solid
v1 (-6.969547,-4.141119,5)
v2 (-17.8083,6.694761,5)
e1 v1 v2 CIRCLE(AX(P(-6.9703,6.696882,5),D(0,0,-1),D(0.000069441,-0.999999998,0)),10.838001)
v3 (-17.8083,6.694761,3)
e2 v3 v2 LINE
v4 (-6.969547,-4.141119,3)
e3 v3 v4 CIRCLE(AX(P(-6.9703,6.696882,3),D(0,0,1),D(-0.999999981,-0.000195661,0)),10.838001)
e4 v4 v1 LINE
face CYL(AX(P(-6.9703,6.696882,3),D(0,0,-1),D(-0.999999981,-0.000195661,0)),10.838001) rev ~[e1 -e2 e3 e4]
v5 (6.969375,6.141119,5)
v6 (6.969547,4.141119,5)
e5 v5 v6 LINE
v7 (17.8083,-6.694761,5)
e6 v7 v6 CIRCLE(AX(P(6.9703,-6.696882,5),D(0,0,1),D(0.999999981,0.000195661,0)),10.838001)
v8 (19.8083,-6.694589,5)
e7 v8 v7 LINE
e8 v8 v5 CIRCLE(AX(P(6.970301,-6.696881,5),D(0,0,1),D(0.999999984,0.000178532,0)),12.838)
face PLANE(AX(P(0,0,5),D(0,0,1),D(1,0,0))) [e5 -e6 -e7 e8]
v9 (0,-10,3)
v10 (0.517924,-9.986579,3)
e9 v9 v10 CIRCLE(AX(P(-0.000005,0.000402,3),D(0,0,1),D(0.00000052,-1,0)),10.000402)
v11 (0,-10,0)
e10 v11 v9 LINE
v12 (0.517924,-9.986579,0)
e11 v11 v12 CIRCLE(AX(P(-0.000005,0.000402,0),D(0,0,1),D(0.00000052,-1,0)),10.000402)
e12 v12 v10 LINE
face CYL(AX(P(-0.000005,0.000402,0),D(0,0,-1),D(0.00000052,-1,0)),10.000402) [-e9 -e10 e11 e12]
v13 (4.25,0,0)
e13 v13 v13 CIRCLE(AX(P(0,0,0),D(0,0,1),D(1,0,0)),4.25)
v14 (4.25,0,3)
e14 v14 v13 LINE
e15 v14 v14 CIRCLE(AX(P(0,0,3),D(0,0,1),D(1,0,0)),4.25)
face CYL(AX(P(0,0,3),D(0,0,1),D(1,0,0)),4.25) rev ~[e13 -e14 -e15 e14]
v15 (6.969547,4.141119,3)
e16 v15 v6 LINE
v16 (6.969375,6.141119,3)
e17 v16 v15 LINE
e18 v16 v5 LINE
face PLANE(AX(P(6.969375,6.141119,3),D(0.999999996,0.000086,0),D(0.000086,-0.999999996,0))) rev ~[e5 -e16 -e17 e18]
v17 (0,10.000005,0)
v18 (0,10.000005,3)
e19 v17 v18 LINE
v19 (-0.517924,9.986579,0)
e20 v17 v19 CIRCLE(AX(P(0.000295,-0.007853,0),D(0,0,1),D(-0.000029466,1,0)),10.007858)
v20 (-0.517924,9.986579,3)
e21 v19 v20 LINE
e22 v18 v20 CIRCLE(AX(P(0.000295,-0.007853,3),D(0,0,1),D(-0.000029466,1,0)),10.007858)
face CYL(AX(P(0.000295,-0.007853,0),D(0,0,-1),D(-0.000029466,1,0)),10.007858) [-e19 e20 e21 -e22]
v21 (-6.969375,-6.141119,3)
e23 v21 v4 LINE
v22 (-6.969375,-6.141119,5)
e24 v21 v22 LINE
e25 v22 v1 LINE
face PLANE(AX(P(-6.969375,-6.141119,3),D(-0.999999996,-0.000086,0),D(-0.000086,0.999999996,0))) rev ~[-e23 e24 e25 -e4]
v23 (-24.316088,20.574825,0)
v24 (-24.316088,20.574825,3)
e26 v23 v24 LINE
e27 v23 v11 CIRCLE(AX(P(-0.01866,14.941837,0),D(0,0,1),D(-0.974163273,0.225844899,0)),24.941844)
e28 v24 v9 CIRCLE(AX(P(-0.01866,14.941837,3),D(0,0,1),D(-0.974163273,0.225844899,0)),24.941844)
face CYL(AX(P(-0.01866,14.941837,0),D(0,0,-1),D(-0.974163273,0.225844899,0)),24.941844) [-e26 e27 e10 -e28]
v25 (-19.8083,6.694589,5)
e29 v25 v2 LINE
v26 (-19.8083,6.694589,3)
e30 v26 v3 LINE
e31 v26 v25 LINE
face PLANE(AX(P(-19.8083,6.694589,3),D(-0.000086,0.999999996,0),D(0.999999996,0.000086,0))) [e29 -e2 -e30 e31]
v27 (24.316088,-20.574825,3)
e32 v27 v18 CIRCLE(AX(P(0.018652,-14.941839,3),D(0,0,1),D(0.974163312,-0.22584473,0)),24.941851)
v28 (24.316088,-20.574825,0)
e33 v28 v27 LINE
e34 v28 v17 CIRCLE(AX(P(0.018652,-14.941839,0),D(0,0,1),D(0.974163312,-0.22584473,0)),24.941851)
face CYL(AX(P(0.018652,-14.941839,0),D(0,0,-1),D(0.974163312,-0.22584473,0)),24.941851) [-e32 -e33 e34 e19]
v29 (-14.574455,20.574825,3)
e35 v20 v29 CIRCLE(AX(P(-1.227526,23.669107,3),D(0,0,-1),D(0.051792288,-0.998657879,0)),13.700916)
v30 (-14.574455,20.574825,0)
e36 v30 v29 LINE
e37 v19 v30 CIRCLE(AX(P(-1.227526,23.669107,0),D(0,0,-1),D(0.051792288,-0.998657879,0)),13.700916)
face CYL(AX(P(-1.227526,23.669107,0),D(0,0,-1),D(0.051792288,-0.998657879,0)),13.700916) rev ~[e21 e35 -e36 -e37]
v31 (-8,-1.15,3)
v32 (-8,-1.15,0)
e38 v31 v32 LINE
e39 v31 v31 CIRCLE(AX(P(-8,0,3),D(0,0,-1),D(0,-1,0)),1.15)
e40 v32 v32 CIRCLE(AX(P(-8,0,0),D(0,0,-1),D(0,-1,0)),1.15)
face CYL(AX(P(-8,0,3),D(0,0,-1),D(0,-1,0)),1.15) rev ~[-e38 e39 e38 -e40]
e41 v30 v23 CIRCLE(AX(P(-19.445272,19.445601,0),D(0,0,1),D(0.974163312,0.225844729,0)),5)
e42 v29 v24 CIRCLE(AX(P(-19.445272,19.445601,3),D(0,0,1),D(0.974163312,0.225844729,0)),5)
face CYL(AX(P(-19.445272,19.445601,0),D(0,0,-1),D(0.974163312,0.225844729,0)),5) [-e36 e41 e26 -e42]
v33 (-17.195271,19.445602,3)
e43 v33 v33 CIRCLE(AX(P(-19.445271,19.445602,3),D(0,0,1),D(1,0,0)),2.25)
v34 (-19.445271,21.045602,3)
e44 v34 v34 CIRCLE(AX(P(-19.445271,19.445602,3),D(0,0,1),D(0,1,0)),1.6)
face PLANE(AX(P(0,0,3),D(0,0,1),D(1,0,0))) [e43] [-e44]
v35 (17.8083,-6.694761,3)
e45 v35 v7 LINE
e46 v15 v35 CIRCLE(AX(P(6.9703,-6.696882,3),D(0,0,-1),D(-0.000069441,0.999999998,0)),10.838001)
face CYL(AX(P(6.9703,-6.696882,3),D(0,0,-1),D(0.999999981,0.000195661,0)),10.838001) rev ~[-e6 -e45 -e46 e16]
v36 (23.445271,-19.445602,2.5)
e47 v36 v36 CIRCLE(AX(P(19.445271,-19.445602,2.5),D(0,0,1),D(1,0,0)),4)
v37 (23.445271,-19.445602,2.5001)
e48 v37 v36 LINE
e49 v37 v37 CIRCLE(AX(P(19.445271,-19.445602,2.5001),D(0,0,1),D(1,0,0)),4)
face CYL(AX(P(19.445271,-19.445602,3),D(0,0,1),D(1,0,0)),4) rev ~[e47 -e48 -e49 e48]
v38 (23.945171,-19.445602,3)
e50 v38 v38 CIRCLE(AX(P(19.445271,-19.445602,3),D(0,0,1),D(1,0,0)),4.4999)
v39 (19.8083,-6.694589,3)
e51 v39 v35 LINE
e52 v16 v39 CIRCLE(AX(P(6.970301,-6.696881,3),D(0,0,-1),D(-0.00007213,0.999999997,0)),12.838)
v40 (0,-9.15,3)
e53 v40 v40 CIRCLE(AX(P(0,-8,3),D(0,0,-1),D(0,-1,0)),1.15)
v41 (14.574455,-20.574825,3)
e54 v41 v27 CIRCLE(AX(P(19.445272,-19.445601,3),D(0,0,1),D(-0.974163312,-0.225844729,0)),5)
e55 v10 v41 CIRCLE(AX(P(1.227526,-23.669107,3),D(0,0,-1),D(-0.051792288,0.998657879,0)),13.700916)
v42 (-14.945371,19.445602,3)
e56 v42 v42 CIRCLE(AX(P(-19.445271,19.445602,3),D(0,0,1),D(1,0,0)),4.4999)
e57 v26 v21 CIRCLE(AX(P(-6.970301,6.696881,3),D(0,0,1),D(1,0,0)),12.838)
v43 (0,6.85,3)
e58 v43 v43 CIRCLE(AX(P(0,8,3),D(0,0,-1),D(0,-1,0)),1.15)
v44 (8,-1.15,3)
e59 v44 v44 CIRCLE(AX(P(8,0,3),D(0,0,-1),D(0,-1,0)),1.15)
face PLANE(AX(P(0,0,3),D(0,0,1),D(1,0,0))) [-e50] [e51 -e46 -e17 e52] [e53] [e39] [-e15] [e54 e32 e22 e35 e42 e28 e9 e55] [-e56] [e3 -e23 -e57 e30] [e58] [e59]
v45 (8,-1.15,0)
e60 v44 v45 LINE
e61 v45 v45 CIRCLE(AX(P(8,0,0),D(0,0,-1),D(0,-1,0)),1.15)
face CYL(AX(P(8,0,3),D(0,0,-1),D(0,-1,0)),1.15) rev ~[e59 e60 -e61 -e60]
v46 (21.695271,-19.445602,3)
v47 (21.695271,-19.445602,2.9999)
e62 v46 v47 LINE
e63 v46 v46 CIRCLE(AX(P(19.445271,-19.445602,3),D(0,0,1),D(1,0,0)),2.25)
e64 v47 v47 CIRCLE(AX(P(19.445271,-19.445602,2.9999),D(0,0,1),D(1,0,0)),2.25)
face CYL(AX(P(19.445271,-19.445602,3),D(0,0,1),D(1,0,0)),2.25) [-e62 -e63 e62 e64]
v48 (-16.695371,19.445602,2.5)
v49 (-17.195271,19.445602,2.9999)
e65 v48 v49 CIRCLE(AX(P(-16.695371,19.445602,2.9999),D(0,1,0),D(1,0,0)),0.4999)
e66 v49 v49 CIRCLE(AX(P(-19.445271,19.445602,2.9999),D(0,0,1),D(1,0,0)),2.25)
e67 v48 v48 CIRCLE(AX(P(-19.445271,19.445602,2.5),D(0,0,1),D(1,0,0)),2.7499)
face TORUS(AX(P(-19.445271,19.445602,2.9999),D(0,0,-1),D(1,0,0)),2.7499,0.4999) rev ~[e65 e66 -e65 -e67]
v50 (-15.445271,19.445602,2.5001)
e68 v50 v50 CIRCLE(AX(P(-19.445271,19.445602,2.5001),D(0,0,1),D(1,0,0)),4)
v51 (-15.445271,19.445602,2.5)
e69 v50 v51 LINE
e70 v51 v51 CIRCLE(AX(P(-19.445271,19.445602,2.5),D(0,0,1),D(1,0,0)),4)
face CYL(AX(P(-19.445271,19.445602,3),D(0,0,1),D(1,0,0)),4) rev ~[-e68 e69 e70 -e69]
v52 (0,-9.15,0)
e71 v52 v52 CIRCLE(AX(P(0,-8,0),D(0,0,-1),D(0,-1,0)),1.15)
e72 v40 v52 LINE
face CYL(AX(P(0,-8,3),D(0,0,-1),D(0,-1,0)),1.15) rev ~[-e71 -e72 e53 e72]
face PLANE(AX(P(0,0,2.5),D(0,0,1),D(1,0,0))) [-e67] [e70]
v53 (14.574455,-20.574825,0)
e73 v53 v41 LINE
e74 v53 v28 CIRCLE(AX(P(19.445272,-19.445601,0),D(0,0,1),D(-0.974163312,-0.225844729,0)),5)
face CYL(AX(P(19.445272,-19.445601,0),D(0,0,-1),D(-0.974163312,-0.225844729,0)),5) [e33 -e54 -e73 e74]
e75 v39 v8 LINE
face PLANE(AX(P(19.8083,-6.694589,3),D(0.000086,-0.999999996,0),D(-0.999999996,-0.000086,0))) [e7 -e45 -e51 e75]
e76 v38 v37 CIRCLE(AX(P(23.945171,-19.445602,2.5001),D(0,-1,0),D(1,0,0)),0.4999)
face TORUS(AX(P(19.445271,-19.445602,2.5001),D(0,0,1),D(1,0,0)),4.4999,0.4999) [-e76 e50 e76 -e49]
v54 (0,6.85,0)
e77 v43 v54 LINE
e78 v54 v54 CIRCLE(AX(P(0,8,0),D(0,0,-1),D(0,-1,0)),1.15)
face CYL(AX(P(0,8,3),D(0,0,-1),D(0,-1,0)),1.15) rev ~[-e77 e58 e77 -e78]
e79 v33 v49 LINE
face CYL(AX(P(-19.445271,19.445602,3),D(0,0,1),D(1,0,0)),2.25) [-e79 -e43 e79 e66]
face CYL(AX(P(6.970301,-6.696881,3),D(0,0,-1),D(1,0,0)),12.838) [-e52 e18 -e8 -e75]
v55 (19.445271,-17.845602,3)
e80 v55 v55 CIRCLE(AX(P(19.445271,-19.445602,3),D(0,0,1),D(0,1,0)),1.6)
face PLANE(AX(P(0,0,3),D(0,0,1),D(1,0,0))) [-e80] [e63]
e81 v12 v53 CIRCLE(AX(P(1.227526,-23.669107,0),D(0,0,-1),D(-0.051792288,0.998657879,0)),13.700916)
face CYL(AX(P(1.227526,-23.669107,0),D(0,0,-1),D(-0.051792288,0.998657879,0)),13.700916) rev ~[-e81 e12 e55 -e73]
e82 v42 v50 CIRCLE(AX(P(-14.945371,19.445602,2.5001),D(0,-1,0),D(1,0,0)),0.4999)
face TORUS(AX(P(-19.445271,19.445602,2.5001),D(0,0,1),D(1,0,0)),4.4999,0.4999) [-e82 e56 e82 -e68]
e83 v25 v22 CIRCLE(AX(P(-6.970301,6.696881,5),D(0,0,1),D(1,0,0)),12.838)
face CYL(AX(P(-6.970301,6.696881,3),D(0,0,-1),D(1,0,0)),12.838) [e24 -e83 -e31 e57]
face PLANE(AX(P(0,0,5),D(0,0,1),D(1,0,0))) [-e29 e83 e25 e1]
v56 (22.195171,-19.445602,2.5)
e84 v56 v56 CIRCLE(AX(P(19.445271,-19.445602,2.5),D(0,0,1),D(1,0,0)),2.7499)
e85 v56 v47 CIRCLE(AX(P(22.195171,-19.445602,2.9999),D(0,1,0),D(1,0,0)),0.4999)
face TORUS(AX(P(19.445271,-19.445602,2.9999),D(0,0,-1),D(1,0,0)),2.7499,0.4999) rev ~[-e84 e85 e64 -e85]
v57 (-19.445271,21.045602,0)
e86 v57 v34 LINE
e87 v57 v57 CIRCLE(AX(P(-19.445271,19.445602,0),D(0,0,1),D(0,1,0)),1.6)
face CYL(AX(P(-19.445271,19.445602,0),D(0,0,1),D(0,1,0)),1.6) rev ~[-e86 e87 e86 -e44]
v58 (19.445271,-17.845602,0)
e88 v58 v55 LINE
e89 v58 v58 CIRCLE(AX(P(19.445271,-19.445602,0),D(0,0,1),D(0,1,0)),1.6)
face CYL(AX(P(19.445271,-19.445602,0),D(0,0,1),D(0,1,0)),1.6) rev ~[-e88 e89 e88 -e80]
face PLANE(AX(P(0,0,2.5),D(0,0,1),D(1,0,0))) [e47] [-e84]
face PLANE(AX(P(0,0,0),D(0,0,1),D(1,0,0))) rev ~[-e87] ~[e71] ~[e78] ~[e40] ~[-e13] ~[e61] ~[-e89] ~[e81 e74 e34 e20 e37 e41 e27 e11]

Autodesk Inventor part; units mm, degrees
ref_plane "YZ Plane" through (0, 0, 0) normal (1, 0, 0) x (0, 1, 0)
ref_plane "XZ Plane" through (0, 0, 0) normal (0, 1, 0) x (-1, 0, 0)
ref_plane "XY Plane" through (0, 0, 0) normal (0, 0, 1) x (1, 0, 0)
sketch "スケッチ1" plane through (0, 0, 0) normal (0, 0, 1) x (1, 0, 0)
  circle A0 centre (0, 0) radius 27.5
  line L0 (0, 27.5) -> (0, 0)
  line L1 (8, 0) -> (19.445271, -19.445602)
  line L2 (0, 0) -> (27.5, 0)
  circle A1 centre (19.445271, -19.445602) radius 5
  circle A2 centre (0, 0) radius 10
  arc A3 (24.316088, -20.574825) -> (0, 10.000005) centre (0.018653, -14.941839) ccw
  line L3 (24.316088, -20.574825) -> (14.574455, -20.574825)
  arc A4 (14.574455, -20.574825) -> (0.517924, -9.986579) centre (1.227526, -23.669106) ccw
  arc A5 (-24.316088, 20.574825) -> (0, -10.000005) centre (-0.018653, 14.941839) ccw
  arc A6 (-14.574455, 20.574825) -> (-0.517924, 9.986579) centre (-1.227526, 23.669106) ccw
  circle A7 centre (-19.445271, 19.445602) radius 5
  point P0 (-0.517924, 9.986579)
  point P1 (0, -10)
  point P2 (0, 10.000005)
  dimension "d4" = 20
  dimension "d0" = 55
  dimension "d1" = 8
  dimension "d2" = 22.56381
  dimension "d3" = 10
  dimension "d5" = 9.74163
  dimension "d9" = 360
sketch "スケッチ1 outline for 押し出し1" plane through (0, 0, 0) normal (0, 0, 1) x (1, 0, 0)
  arc A0 (14.574455, -20.574825) -> (24.316088, -20.574825) centre (19.445271, -19.445602) ccw
  arc A1 (24.316088, -20.574825) -> (0, 10.000005) centre (0.018653, -14.941839) ccw
  arc A2 (0, 10) -> (-0.517924, 9.986579) centre (0, 0) ccw
  arc A3 (-0.517924, 9.986579) -> (-14.574455, 20.574825) centre (-1.227526, 23.669106) cw
  arc A4 (-14.574455, 20.574825) -> (-24.316088, 20.574825) centre (-19.445271, 19.445602) ccw
  arc A5 (-24.316088, 20.574825) -> (0, -10) centre (-0.018659, 14.941837) ccw
  arc A6 (0, -10) -> (0.517924, -9.986579) centre (0, 0) ccw
  arc A7 (0.517924, -9.986579) -> (14.574455, -20.574825) centre (1.227526, -23.669106) cw
extrude "押し出し1" add sketch "スケッチ1 outline for 押し出し1" along normal blind 3
sketch "スケッチ2" plane through (0, 0, 3) normal (0, 0, 1) x (1, 0, 0)
  circle A0 centre (0, 0) radius 4.25
  dimension "d13" = 8.5
extrude "押し出し2" cut sketch "スケッチ2" against normal blind 3
sketch "スケッチ3" plane through (0, 0, 3) normal (0, 0, 1) x (1, 0, 0)
  arc A0 (-14.574455, 20.574825) -> (-24.316088, 20.574825) centre (-19.445271, 19.445602) ccw
  arc A1 (14.574455, -20.574825) -> (24.316088, -20.574825) centre (19.445271, -19.445602) ccw
  circle A2 centre (0, 0) radius 4.25
  point P0 (8, 0)
  point P1 (-8, 0)
  point P2 (0, 8)
  point P3 (-8, 0)
  point P4 (0, -8)
  dimension "d16" = 8
  dimension "d17" = 8
  dimension "d49" = 360
hole "穴1" at (-19.445271, 19.445602, 3) at (19.445271, -19.445602, 3) at (8, 0, 3) at (-8, 0, 3) at (0, 8, 3) at (0, -8, 3) direction (0, 0, -1) diameter 2.3 end through all
sketch "スケッチ4" plane through (0, 0, 3) normal (0, 0, 1) x (1, 0, 0)
  circle A0 centre (0, 0) radius 9.289
  circle A1 centre (8, 0) radius 1.15
  circle A2 centre (8, 0) radius 6.227
  circle A3 centre (0, 0) radius 8.107
  circle A4 centre (8, 0) radius 4.267399
  line L0 (6.969375, 6.141119) -> (6.969547, 4.141119)
  circle A5 centre (6.970301, -6.696881) radius 12.838
  circle A6 centre (0, 0) radius 20.909
  circle A7 centre (8, 0) radius 13.574
  line L1 (19.8083, -6.694589) -> (17.8083, -6.694761)
  arc A8 (17.8083, -6.694761) -> (6.969547, 4.141119) centre (6.970301, -6.696881) ccw
  circle A9 centre (-6.970301, 6.696881) radius 12.838
  line L2 (-19.8083, 6.694589) -> (-17.8083, 6.694761)
  arc A10 (-17.8083, 6.694761) -> (-6.969547, -4.141119) centre (-6.970301, 6.696881) ccw
  line L3 (-6.969375, -6.141119) -> (-6.969547, -4.141119)
  point P0 (6.969547, 4.141119)
  point P1 (-6.969547, -4.141119)
  dimension "d25" = 18.578
  dimension "d26" = 12.454
  dimension "d30" = 41.818
  dimension "d31" = 27.148
  dimension "d27" = 16.214
  dimension "d29" = 25.676
  dimension "d32" = 2
  dimension "d33" = 2
  dimension "d36" = 360
extrude "押し出し3" add sketch "スケッチ4" along normal blind 2 contours A8 A4 A0 | A0 A4 A8 | A4 L0 A0 | A0 A5 A2 A8 A4 | A2 A5 L1 A8 | A9 L2 A10 A0 | A0 A10 L3 picked at (7.717949, 4.165451) picked at (9.179473, 4.022297)
sketch "スケッチ5" plane through (0, 0, 0) normal (0, 0, -1) x (-1, 0, 0)
  circle A0 centre (19.445271, 19.445602) radius 1.15
  circle A1 centre (-19.445271, -19.445602) radius 1.15
  point P0 (0, 0)
hole "穴2" at (-19.445271, 19.445602, 0) at (19.445271, -19.445602, 0) direction (0, 0, 1) diameter 3.2 end through all
sketch "スケッチ6" plane through (0, 0, 3) normal (0, 0, 1) x (1, 0, 0)
  circle A0 centre (-19.445271, 19.445602) radius 1.6
  circle A1 centre (-19.445271, 19.445602) radius 2.25
  circle A2 centre (-19.445271, 19.445602) radius 4
  circle A3 centre (19.445271, -19.445602) radius 1.6
  circle A4 centre (19.445271, -19.445602) radius 2.25
  circle A5 centre (19.445271, -19.445602) radius 4
  point P0 (0, 0)
  dimension "d51" = 4.5
  dimension "d52" = 8
  dimension "d53" = 4.5
  dimension "d54" = 8
extrude "押し出し4" cut sketch "スケッチ6" against normal blind 0.5 contours A2 | A5
fillet "フィレット1" radius 0.5 4 edges at (-21.6953, 19.4456, 2.5) (17.1953, -19.4456, 2.5) (-23.4453, 19.4456, 3) (15.4453, -19.4456, 3)
properties part number "rotor_ver2" material "アルミニウム 6061"
